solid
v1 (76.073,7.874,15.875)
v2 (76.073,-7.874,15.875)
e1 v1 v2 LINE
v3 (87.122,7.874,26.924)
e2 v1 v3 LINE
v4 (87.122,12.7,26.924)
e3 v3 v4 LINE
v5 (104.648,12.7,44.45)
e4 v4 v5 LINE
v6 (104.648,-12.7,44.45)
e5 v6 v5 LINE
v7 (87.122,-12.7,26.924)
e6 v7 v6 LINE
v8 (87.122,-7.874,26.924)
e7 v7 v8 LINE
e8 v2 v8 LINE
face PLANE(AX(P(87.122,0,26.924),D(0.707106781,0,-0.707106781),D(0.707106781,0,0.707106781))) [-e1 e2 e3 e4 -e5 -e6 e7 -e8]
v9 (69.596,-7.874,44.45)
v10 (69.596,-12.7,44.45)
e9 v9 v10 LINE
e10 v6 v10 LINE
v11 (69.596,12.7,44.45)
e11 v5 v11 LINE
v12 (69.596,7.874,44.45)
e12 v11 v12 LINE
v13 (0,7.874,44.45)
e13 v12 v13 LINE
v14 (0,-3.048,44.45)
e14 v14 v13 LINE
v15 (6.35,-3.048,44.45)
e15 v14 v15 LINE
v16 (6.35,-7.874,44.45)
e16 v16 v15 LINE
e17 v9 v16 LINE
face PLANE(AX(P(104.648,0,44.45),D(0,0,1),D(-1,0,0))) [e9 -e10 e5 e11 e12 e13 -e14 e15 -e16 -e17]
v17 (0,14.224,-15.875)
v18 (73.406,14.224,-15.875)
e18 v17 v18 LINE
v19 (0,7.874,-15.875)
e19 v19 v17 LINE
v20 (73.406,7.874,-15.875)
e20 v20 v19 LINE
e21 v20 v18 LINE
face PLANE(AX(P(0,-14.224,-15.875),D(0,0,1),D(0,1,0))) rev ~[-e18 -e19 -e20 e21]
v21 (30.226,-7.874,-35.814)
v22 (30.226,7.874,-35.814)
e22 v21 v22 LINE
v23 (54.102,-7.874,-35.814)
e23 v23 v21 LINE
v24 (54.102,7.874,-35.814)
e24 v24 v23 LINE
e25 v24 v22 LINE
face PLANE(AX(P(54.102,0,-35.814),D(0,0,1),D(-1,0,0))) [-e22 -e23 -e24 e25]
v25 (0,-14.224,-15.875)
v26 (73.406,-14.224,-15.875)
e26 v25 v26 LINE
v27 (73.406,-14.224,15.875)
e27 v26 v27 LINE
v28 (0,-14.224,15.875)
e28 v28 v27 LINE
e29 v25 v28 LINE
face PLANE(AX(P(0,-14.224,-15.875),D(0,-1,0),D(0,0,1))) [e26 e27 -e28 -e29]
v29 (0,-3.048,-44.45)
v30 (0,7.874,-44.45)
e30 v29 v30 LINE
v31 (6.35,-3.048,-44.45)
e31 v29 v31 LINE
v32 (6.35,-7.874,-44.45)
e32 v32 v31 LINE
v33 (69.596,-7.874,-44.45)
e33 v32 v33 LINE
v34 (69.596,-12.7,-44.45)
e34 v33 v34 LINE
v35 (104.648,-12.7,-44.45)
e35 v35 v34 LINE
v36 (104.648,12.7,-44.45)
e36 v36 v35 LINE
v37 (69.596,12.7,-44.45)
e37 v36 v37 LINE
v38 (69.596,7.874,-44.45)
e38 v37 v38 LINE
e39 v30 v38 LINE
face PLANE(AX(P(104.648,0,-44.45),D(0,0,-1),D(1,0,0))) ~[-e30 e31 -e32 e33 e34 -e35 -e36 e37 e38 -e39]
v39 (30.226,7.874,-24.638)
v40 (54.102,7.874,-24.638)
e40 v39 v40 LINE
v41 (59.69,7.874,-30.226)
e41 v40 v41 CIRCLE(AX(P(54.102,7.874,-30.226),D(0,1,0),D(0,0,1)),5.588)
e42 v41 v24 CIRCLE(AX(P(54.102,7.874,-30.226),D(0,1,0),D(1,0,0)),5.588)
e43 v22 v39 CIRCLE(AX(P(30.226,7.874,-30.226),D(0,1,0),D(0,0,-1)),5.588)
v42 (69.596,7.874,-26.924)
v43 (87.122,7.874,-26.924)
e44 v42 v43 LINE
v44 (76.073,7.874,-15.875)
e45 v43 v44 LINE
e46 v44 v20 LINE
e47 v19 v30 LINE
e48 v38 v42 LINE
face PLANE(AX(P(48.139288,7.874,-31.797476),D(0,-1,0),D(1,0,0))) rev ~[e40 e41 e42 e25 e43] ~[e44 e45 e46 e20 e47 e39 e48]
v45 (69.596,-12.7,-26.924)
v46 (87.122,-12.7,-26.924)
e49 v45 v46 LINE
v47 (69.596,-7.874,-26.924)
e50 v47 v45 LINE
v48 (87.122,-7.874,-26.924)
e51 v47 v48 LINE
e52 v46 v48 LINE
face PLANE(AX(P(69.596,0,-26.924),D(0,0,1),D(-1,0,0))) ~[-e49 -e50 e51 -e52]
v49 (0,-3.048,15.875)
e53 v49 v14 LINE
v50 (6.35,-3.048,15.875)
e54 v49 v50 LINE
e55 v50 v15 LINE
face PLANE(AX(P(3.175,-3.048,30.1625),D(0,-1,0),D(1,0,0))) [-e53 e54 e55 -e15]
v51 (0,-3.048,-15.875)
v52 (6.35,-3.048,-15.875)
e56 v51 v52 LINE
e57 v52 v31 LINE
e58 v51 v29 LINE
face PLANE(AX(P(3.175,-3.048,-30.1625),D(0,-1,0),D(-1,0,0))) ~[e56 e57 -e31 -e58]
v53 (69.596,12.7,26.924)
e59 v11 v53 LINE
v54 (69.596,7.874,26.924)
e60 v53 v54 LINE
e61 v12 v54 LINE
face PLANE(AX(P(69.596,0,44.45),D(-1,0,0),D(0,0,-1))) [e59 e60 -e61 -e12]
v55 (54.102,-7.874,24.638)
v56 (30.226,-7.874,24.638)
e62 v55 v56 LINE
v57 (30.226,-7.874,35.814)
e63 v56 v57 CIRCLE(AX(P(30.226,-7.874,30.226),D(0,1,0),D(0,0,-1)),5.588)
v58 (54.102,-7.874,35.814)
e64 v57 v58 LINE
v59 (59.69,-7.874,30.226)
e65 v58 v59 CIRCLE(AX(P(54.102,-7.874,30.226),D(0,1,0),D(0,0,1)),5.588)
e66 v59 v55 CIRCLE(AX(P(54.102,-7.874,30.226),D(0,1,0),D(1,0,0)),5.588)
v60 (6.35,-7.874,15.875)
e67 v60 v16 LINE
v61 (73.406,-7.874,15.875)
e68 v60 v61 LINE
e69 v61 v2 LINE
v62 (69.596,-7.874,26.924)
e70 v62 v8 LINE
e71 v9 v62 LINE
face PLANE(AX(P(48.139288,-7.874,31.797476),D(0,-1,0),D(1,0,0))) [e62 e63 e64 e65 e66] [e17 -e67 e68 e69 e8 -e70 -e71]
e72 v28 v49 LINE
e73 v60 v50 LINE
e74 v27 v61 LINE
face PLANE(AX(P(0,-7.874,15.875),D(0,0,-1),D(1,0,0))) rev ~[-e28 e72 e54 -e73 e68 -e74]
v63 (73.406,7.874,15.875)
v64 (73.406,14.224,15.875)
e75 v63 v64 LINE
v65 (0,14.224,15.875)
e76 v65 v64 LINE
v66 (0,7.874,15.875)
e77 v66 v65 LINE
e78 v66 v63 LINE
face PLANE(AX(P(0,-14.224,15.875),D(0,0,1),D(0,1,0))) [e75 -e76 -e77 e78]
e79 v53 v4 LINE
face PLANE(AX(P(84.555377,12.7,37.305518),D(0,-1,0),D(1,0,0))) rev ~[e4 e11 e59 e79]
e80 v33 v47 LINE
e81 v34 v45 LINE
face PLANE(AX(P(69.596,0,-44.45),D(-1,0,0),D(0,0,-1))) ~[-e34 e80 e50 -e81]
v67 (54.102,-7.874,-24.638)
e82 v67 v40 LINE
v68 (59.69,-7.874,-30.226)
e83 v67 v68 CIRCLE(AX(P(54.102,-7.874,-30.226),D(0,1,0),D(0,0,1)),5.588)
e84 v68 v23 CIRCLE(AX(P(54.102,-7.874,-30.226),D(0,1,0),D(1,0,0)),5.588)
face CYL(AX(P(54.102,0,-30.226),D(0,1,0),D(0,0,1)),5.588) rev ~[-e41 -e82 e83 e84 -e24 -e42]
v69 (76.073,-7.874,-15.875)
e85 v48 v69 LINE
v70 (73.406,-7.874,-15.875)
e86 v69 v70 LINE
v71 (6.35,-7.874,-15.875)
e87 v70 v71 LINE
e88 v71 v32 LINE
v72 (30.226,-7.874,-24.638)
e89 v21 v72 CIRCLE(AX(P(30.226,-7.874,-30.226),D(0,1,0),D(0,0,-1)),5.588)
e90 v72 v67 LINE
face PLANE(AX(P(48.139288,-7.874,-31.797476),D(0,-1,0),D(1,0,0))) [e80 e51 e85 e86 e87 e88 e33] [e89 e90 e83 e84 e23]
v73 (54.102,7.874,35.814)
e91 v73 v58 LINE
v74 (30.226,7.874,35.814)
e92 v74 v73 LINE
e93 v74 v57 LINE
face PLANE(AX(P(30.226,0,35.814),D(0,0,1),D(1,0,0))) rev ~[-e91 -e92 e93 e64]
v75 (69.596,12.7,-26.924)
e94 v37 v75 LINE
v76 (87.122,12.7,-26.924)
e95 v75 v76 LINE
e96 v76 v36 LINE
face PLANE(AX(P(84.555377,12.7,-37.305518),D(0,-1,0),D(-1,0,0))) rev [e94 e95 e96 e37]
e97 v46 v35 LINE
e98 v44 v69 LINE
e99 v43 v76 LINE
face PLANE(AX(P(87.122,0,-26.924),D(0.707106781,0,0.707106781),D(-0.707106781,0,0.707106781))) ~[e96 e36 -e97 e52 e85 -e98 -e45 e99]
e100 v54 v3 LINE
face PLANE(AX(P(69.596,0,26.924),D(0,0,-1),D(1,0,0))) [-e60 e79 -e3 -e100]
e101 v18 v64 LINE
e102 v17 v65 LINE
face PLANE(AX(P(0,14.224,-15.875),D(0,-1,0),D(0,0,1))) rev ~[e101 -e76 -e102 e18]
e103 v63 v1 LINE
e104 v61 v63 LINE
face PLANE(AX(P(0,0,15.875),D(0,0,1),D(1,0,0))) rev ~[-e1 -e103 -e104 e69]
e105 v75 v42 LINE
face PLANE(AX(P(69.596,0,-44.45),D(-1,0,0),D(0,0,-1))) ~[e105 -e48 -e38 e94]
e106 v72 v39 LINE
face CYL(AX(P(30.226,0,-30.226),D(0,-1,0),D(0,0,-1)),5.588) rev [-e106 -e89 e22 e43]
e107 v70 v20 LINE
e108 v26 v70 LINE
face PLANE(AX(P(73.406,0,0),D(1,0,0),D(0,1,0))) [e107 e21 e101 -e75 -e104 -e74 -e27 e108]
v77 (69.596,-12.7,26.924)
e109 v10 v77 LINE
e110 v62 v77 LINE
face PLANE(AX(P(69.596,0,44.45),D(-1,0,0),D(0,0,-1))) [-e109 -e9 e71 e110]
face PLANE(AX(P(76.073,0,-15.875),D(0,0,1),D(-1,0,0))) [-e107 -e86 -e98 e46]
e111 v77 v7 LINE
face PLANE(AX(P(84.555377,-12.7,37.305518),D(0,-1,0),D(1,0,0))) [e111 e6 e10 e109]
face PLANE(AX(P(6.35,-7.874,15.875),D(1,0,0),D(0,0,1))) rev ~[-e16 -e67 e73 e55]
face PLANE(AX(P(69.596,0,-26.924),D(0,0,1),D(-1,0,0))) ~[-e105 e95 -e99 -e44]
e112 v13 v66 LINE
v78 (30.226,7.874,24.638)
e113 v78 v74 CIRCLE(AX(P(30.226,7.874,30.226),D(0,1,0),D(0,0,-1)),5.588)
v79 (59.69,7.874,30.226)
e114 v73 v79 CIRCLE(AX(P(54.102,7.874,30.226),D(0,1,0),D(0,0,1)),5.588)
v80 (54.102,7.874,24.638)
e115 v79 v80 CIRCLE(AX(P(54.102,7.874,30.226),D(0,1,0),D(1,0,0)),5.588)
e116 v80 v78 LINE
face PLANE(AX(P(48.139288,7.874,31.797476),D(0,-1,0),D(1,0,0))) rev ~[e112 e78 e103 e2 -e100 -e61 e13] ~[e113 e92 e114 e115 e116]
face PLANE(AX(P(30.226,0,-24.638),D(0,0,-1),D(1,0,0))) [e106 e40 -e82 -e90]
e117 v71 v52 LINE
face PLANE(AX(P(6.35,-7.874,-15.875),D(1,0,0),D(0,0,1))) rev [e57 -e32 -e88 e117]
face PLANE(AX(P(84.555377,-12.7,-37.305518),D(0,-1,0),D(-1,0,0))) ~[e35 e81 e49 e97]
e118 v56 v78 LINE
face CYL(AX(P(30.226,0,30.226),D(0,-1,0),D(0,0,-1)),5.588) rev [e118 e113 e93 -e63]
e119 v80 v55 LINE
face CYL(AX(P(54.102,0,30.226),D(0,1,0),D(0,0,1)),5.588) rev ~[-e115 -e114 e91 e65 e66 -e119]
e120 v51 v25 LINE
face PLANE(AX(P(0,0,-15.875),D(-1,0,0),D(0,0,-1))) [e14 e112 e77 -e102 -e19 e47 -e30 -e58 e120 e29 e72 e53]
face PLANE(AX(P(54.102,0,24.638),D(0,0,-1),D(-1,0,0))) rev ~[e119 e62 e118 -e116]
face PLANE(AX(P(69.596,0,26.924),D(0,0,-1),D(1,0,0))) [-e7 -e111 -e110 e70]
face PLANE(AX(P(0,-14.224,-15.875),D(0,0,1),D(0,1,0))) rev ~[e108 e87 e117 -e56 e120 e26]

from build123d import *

# Parameters (mm, degrees)
F0_W     = 28.448
F0_H     = 31.75
F1_DEPTH = 73.406
F3_DEPTH = 7.874
F4_W     = 6.35
F4_H     = 28.575
F5_DEPTH = 4.826
F7_DEPTH = 12.7


# Not quite as in the source:
# - a pattern or mirror of a feature is missing from the dataset's text; its kind, count and spacing are read off the source's solid
# - a feature names something its author has since deleted; it is built from what else it names


with BuildPart() as f1:
    # F0 (on Right) → F1 (new body)
    with BuildSketch(Plane.YZ):
        Rectangle(F0_W, F0_H)
    extrude(amount=F1_DEPTH)

    # F2 (on Front) → F3 (join, symmetric)
    with BuildSketch(Plane.XZ):
        Polygon((0, 44.45), (0, 15.875), (73.406, 15.875), (76.073, 15.875), (104.648, 44.45), align=None)
        with BuildLine():
            ThreePointArc((30.226, 24.638), (24.638, 30.226), (30.226, 35.814))
            Line((30.226, 35.814), (54.102, 35.814))
            ThreePointArc((54.102, 35.814), (58.0533126933, 34.1773126933), (59.69, 30.226))
            ThreePointArc((59.69, 30.226), (58.0533126933, 26.2746873067), (54.102, 24.638))
            Line((54.102, 24.638), (30.226, 24.638))
        make_face(mode=Mode.SUBTRACT)
        Polygon((104.648, -44.45), (76.073, -15.875), (73.406, -15.875), (0, -15.875), (0, -44.45), align=None)
        with BuildLine():
            ThreePointArc((54.102, -24.638), (58.0533126933, -26.2746873067), (59.69, -30.226))
            ThreePointArc((59.69, -30.226), (58.0533126933, -34.1773126933), (54.102, -35.814))
            Line((54.102, -35.814), (30.226, -35.814))
            ThreePointArc((30.226, -35.814), (24.638, -30.226), (30.226, -24.638))
            Line((30.226, -24.638), (54.102, -24.638))
        make_face(mode=Mode.SUBTRACT)
    extrude(amount=F3_DEPTH, both=True)

    # F4 (on face) → F5 (cut)
    with BuildSketch(Plane.XZ.offset(7.874)):
        with Locations((3.175, 30.1625)):
            Rectangle(F4_W, F4_H)
    f5 = extrude(amount=-F5_DEPTH, mode=Mode.SUBTRACT)

    # F5_copies: F5 across plane
    add(f5.mirror(Plane(origin=(0, 0, 0), x_dir=(-1, 0, 0), z_dir=(0, 0, -1))), mode=Mode.SUBTRACT)

    # F6 (on Front) → F7 (join, symmetric)
    with BuildSketch(Plane.XZ):
        Polygon((104.648, 44.45), (69.596, 44.45), (69.596, 26.924), (87.122, 26.924), align=None)
    f7 = extrude(amount=F7_DEPTH, both=True)

    # F7_copies: F7 across plane
    add(f7.mirror(Plane(origin=(0, 0, 0), x_dir=(-1, 0, 0), z_dir=(0, 0, -1))))


solid = f1.part
